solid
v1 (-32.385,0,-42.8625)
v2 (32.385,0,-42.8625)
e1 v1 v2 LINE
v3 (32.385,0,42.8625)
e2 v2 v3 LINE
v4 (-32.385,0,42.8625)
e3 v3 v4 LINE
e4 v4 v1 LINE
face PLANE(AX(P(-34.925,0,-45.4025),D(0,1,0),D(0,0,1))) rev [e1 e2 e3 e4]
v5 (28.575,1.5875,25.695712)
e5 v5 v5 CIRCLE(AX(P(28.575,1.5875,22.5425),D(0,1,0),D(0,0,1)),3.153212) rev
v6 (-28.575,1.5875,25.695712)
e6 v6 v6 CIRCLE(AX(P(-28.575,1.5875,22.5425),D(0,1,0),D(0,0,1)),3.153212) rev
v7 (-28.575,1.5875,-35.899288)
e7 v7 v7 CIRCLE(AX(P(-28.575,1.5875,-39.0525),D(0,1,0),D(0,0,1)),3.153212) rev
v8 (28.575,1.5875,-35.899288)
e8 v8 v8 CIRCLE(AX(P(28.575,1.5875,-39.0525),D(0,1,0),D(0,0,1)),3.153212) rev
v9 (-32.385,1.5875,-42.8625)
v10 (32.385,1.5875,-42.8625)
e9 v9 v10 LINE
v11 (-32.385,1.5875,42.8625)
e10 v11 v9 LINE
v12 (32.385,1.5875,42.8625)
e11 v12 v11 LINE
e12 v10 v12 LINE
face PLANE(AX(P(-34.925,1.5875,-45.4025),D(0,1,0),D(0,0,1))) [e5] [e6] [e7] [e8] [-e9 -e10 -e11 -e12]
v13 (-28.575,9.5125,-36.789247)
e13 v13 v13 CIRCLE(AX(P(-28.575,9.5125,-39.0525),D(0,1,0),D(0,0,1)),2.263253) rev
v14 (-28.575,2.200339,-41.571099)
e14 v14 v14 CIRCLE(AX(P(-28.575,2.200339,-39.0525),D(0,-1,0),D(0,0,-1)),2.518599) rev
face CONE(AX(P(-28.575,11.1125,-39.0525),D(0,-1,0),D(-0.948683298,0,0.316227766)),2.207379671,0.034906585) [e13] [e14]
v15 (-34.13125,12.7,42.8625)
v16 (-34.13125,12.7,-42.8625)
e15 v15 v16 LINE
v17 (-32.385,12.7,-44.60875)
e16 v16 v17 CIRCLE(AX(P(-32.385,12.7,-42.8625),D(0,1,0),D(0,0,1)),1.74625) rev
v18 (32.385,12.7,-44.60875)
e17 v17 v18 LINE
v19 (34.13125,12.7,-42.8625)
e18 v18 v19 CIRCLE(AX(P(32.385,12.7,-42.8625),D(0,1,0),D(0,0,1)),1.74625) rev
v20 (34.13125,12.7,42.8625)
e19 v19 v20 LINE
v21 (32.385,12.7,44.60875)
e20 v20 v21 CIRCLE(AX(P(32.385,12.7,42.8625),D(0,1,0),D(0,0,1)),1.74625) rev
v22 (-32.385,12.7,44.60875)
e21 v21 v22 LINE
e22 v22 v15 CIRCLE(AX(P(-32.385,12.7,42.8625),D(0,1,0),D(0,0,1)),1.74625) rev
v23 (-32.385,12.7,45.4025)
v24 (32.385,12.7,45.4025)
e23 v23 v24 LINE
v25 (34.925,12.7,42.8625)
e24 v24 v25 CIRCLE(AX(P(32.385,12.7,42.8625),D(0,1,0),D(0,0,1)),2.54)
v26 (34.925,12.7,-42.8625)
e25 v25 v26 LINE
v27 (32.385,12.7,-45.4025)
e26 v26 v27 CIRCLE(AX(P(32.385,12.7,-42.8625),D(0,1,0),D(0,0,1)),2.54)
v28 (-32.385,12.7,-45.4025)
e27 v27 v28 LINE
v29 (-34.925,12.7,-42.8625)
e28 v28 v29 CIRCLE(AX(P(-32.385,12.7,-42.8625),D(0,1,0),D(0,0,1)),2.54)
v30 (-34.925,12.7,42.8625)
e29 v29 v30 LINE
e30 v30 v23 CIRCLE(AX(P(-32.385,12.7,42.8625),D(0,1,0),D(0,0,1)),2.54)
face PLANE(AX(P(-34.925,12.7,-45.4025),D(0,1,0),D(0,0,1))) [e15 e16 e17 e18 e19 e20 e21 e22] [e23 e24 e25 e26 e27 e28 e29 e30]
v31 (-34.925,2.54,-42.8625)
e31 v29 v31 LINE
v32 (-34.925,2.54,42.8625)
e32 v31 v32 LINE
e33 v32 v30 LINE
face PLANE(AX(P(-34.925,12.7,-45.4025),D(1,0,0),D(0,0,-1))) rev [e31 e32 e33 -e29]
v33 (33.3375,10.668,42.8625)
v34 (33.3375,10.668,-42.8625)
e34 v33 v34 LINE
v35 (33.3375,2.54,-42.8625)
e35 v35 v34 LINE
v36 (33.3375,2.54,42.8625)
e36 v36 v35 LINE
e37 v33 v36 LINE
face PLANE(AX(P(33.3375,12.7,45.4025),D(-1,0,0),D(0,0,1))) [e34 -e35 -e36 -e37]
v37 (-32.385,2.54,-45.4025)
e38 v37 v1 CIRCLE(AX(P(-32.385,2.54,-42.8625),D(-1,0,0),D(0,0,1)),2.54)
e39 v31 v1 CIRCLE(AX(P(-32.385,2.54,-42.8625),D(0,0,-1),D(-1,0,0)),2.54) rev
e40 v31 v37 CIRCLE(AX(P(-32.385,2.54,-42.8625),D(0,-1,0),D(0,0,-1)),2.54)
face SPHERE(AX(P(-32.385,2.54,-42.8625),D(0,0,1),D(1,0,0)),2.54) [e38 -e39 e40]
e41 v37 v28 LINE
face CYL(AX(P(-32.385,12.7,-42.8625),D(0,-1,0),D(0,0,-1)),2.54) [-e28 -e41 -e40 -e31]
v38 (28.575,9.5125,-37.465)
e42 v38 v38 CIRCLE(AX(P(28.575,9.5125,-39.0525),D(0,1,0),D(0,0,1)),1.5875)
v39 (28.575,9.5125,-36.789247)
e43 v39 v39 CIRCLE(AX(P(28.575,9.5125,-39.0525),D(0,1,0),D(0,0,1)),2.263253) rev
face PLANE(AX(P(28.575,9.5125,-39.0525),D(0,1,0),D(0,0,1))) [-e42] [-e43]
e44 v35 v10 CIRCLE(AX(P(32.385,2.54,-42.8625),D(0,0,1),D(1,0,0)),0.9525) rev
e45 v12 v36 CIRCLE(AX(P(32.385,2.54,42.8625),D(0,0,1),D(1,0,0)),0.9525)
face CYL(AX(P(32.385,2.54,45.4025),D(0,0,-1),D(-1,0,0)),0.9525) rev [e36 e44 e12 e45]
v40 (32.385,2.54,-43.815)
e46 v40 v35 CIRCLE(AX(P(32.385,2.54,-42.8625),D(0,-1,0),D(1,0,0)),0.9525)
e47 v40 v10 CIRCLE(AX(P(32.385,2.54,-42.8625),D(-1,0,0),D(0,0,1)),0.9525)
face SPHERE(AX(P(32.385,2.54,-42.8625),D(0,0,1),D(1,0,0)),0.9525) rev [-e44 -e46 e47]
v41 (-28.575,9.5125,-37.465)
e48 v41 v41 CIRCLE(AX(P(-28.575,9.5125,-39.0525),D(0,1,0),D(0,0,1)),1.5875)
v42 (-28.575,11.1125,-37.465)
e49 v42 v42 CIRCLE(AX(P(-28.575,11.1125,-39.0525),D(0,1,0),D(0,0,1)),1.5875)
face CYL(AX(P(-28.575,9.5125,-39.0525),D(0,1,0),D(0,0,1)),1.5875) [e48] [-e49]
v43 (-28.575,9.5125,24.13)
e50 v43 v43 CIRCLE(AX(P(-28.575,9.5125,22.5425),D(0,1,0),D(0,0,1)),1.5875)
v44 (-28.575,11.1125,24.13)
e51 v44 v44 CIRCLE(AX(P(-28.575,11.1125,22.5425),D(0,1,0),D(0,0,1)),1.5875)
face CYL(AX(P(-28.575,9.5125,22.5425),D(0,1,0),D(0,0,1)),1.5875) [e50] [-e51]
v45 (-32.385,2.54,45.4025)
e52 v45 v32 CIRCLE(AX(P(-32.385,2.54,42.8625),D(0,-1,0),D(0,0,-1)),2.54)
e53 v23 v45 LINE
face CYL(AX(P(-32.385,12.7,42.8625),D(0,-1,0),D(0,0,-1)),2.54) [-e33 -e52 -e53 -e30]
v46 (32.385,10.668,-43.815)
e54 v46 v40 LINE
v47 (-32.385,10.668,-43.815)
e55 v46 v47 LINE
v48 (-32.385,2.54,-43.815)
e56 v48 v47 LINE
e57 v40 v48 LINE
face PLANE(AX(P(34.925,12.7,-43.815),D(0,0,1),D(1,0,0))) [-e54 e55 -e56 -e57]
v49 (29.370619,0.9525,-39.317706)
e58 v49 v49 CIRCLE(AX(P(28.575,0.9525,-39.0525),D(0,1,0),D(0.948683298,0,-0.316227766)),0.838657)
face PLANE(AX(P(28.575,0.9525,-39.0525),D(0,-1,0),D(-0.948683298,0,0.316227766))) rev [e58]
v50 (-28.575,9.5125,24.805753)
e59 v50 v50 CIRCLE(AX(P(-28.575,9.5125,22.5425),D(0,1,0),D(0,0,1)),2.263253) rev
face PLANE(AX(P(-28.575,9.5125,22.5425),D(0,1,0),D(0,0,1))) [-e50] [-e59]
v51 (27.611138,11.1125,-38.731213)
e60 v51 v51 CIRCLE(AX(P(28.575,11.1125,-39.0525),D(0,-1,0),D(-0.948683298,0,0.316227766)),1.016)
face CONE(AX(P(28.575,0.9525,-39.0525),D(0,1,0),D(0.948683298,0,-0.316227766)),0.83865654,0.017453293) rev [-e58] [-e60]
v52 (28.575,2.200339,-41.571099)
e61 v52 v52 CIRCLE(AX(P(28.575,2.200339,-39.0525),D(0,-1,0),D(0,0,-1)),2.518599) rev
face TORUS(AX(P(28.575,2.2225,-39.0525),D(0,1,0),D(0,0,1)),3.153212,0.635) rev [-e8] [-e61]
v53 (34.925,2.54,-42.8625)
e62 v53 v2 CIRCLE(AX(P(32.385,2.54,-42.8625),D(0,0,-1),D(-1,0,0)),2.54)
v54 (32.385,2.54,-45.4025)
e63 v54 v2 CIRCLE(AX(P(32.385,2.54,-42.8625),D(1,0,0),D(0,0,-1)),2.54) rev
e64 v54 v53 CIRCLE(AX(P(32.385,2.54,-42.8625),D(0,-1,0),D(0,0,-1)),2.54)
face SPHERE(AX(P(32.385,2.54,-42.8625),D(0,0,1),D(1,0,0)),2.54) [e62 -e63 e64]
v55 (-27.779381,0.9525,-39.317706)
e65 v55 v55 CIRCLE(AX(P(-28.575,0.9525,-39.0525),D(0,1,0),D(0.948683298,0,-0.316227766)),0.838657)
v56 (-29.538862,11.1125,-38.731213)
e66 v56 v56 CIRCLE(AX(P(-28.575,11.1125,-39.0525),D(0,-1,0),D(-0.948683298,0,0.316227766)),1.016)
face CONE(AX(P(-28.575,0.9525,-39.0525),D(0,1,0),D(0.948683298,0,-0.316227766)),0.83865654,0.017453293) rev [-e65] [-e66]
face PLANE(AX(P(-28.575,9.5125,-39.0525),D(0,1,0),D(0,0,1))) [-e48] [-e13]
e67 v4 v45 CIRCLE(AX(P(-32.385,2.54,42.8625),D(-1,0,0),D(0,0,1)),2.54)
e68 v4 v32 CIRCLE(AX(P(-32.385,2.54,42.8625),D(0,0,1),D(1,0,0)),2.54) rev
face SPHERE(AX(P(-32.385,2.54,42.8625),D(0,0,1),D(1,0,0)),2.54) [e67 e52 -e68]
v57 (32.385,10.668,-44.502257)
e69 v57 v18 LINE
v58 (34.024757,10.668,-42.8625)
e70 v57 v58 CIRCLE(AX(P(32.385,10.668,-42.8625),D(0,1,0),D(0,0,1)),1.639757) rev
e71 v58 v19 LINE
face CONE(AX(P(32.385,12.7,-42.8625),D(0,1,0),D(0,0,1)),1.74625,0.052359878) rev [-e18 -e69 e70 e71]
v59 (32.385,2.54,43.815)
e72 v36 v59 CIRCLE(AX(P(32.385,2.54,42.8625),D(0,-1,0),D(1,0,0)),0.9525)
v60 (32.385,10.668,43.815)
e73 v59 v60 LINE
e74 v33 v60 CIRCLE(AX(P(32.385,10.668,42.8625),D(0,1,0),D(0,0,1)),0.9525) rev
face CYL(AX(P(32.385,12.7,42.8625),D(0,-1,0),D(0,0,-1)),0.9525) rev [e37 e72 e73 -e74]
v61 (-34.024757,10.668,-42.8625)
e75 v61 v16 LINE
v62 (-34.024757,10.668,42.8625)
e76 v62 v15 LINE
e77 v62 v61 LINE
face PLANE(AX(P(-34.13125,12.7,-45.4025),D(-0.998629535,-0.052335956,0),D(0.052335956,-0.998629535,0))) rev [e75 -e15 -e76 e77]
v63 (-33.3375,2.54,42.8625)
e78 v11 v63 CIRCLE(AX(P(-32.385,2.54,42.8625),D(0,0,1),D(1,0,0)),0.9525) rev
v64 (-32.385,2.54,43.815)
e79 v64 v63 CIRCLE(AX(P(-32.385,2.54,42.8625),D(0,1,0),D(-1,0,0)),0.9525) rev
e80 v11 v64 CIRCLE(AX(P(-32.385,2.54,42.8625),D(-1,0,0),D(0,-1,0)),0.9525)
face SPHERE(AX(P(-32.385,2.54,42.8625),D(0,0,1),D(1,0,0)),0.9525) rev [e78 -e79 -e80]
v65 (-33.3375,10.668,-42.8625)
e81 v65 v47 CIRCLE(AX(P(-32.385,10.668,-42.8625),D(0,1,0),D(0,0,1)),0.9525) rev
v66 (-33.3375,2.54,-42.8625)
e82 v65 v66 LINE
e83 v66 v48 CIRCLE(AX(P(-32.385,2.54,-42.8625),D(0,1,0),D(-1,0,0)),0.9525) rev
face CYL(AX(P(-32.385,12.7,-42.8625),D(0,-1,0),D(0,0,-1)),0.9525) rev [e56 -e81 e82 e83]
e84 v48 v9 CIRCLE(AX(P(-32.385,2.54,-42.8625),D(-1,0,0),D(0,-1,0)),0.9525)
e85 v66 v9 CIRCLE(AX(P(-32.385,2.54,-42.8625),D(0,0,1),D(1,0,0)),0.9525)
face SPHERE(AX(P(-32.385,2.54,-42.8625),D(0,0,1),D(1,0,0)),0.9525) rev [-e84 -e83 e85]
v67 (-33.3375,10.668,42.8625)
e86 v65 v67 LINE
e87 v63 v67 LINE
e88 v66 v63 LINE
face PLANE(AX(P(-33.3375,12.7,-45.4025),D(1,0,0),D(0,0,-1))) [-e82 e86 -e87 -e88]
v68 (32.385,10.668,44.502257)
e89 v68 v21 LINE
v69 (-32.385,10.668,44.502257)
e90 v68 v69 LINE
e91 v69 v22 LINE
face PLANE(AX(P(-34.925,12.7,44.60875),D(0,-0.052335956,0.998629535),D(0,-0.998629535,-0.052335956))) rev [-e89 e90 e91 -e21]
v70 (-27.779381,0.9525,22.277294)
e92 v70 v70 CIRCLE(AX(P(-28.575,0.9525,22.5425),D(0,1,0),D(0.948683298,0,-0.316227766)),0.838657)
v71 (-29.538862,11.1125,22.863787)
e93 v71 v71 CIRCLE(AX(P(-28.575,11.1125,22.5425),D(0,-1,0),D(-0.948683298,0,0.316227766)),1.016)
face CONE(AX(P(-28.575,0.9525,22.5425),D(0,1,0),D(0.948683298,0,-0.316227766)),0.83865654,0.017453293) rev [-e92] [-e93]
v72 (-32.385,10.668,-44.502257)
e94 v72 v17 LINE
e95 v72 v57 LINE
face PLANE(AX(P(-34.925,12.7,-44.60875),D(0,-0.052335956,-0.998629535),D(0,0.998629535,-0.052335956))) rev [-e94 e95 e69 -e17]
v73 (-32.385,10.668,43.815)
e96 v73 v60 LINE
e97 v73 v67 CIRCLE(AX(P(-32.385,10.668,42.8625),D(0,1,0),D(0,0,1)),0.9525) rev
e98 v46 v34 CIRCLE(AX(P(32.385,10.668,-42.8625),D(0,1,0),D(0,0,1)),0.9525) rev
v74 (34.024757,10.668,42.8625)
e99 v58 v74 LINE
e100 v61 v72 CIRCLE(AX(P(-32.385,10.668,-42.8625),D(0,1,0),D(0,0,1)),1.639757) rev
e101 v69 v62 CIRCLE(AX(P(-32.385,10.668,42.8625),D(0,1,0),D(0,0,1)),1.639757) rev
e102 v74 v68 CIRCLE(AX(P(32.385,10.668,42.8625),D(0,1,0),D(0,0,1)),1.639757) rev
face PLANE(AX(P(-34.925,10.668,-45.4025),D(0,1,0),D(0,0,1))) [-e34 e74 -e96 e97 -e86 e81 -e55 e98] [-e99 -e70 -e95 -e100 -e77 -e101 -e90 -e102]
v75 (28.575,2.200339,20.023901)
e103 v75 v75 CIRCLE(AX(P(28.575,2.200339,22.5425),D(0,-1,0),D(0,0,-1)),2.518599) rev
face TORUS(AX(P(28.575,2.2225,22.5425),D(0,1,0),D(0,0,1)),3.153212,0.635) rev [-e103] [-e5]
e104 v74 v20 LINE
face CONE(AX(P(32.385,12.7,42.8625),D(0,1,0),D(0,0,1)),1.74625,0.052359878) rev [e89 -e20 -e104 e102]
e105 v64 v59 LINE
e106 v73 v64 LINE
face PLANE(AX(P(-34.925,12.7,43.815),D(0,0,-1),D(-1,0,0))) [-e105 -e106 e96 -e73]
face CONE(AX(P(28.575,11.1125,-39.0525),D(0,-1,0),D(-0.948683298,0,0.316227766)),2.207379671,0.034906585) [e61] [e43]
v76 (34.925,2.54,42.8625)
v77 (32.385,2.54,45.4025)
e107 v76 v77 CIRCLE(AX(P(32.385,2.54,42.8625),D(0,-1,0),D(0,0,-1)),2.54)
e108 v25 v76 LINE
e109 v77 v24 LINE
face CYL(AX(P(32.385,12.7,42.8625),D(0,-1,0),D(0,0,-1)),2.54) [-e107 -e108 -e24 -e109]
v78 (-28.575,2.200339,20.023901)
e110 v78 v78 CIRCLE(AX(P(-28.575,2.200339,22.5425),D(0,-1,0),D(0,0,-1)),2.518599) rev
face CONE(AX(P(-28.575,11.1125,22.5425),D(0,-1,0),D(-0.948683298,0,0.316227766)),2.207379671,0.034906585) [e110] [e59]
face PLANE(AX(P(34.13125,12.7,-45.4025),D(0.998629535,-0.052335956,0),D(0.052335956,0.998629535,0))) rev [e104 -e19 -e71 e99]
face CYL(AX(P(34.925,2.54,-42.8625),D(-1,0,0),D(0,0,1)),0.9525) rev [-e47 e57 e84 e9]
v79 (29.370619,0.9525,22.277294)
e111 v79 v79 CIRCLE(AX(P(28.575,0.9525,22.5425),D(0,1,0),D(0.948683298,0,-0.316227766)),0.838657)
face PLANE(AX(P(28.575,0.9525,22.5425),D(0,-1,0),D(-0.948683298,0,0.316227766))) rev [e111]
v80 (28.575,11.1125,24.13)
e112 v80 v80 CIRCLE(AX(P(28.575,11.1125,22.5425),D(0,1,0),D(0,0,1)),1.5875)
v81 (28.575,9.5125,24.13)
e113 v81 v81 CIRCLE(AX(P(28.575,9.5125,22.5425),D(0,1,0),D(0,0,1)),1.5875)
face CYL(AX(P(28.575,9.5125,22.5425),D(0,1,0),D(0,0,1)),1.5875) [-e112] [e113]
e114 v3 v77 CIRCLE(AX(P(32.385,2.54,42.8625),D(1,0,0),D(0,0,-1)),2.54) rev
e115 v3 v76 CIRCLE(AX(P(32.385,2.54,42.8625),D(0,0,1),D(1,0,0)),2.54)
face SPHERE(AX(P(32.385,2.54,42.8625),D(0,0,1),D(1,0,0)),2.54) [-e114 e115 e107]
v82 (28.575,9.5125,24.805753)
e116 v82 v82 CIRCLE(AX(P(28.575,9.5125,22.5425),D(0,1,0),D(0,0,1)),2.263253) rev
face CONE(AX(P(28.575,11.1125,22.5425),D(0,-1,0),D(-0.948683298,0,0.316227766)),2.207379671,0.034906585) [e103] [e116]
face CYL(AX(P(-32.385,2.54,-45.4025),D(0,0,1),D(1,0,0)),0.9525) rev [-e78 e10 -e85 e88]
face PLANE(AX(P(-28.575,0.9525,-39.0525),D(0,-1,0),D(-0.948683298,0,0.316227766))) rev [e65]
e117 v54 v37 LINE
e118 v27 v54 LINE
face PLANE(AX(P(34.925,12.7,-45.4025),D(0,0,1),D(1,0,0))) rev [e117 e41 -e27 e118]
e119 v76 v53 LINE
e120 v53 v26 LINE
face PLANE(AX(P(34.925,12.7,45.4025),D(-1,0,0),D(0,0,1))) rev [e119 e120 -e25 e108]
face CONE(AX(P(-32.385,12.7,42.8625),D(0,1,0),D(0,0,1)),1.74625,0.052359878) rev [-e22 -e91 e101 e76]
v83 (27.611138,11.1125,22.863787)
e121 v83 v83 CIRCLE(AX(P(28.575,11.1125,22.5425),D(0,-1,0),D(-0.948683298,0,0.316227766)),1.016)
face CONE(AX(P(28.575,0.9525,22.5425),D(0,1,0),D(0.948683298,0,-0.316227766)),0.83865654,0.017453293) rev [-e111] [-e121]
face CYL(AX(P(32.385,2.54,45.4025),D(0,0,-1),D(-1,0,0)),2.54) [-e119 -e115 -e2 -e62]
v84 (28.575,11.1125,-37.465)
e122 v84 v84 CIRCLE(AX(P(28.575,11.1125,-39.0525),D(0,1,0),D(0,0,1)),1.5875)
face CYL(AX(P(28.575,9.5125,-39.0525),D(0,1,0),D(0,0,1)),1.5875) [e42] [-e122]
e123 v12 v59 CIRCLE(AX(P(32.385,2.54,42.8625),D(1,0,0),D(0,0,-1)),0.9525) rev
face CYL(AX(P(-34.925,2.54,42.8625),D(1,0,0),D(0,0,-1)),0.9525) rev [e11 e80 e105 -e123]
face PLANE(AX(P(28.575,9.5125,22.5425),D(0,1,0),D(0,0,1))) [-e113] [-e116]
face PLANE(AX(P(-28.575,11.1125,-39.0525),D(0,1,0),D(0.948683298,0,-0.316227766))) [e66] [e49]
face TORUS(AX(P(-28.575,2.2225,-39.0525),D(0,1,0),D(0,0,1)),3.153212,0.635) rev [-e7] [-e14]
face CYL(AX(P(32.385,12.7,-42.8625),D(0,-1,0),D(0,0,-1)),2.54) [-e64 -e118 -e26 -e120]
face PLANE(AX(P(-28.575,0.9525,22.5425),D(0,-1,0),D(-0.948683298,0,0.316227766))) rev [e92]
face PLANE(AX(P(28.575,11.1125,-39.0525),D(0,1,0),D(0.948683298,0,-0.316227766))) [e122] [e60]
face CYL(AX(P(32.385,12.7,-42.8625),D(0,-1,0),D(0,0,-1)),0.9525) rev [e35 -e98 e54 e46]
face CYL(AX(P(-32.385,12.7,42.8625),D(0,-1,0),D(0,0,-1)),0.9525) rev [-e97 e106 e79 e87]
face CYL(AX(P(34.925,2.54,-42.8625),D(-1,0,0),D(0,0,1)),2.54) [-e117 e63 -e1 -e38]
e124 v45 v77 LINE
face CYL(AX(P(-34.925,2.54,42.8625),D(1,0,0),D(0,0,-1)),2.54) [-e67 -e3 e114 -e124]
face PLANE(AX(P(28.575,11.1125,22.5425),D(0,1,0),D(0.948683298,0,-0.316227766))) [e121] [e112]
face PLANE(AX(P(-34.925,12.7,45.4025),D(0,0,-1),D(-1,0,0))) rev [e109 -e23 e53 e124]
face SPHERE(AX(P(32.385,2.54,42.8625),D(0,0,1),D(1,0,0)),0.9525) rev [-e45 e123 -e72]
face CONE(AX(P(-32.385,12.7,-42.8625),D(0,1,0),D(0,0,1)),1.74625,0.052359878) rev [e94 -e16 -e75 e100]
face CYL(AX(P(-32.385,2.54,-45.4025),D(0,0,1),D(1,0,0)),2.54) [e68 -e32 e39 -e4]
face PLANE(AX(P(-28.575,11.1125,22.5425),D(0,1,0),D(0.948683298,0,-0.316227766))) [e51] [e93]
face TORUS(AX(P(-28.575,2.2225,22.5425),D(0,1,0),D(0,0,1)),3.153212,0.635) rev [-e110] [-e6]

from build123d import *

# Parameters (mm, degrees)
SKETCH2_W               = 69.85
SKETCH2_H               = 90.805
BOSS_EXTRUDE1_DEPTH     = 12.7
FILLET1_R               = 2.54
SHELL1_T                = -1.5875
SKETCH3_R               = 2.8575
SKETCH3_R_2             = 1.5875
CUT_EXTRUDE_THIN1_DEPTH = 1.6
LPATTERN1_COUNT         = 2
LPATTERN1_PITCH         = 57.15
LPATTERN1_COUNT_DIR2    = 2
LPATTERN1_PITCH_DIR2    = 61.595
FILLET3_R               = 0.635


with BuildPart() as part:
    # Sketch2 → Boss-Extrude1 (new body)
    with BuildSketch(Plane(origin=(0, 0, 0), x_dir=(1, 0, 0), z_dir=(0, 1, 0))):
        Rectangle(SKETCH2_W, SKETCH2_H)
    extrude(amount=BOSS_EXTRUDE1_DEPTH)

    # Fillet1
    fillet1_edges = [part.edges().sort_by_distance(p)[0] for p in [
        (34.925, 0, 0),
        (0, 0, 45.4025),
        (-34.925, 0, 0),
        (0, 0, -45.4025),
        (34.925, 6.35, -45.4025),
        (34.925, 6.35, 45.4025),
        (-34.925, 6.35, 45.4025),
        (-34.925, 6.35, -45.4025),
    ]]
    fillet(fillet1_edges, radius=FILLET1_R)

    # Shell1
    shell1_openings = [part.faces().sort_by_distance(p)[0] for p in [
        (0, 12.7, 0),
    ]]
    offset(amount=SHELL1_T, openings=shell1_openings, kind=Kind.INTERSECTION)

    # Groove1: read off the stored shape, not the designer's step
    # Groove1: loft between two sections, ruled curve by curve
    groove1_from = [
        Edge.make_three_point_arc((32.385, 10.668, 44.502257392), (33.544483572, 10.668, 44.021983572), (34.024757392, 10.668, 42.8625)),
        Edge.make_three_point_arc((34.024757392, 10.668, -42.8625), (33.544483572, 10.668, -44.021983572), (32.385, 10.668, -44.502257392)),
        Edge.make_three_point_arc((-32.385, 10.668, -44.502257392), (-33.544483572, 10.668, -44.021983572), (-34.024757392, 10.668, -42.8625)),
        Edge.make_three_point_arc((-34.024757392, 10.668, 42.8625), (-33.544483572, 10.668, 44.021983572), (-32.385, 10.668, 44.502257392)),
        Edge.make_line((32.385, 10.668, 44.502257392), (-32.385, 10.668, 44.502257392)),
        Edge.make_line((34.024757392, 10.668, -42.8625), (34.024757392, 10.668, 42.8625)),
        Edge.make_line((-32.385, 10.668, -44.502257392), (32.385, 10.668, -44.502257392)),
        Edge.make_line((-34.024757392, 10.668, 42.8625), (-34.024757392, 10.668, -42.8625)),
    ]
    groove1_to = [
        Edge.make_three_point_arc((32.385, 12.7, 44.60875), (33.619785217, 12.7, 44.097285217), (34.13125, 12.7, 42.8625)),
        Edge.make_three_point_arc((34.13125, 12.7, -42.8625), (33.619785217, 12.7, -44.097285217), (32.385, 12.7, -44.60875)),
        Edge.make_three_point_arc((-32.385, 12.7, -44.60875), (-33.619785217, 12.7, -44.097285217), (-34.13125, 12.7, -42.8625)),
        Edge.make_three_point_arc((-34.13125, 12.7, 42.8625), (-33.619785217, 12.7, 44.097285217), (-32.385, 12.7, 44.60875)),
        Edge.make_line((32.385, 12.7, 44.60875), (-32.385, 12.7, 44.60875)),
        Edge.make_line((34.13125, 12.7, -42.8625), (34.13125, 12.7, 42.8625)),
        Edge.make_line((-32.385, 12.7, -44.60875), (32.385, 12.7, -44.60875)),
        Edge.make_line((-34.13125, 12.7, 42.8625), (-34.13125, 12.7, -42.8625)),
    ]
    groove1 = Solid(Shell([*[Face.make_surface_from_curves(groove1_from[k], groove1_to[k]) for k in range(8)], Face(Wire(groove1_from)), Face(Wire(groove1_to))]))
    add(groove1, mode=Mode.SUBTRACT)

    # Mounting Boss1: read off the stored shape, not the designer's step
    # Mounting Boss1 outline → Mounting Boss1 (revolve, cut)
    with BuildSketch(Plane(origin=(-28.575, 0, -39.0525), x_dir=(1, 0, 0), z_dir=(0, 0, 1))):
        Polygon((0.83865654, 0.9525), (0.849740506, 1.5875), (0, 1.5875), (0, 0.9525), align=None)
    mounting_boss1 = revolve(axis=Axis((-28.575, 0, -39.0525), (0, 1, 0)), mode=Mode.SUBTRACT)

    # Mounting Boss1 2 outline → Mounting Boss1 2 (revolve)
    with BuildSketch(Plane(origin=(-28.575, 0, -39.0525), x_dir=(1, 0, 0), z_dir=(0, 0, 1))):
        Polygon((2.207379671, 11.1125), (1.016, 11.1125), (0.849740506, 1.5875), (2.54, 1.5875), align=None)
    mounting_boss1_2 = revolve(axis=Axis((-28.575, 0, -39.0525), (0, 1, 0)))

    # Sketch3 → Cut-Extrude-Thin1 (cut)
    with BuildSketch(Plane(origin=(0, 11.1125, 0), x_dir=(1, 0, 0), z_dir=(0, 1, 0))):
        with Locations((-28.575, 39.0525)):
            Circle(SKETCH3_R)
        with Locations((-28.575, 39.0525)):
            Circle(SKETCH3_R_2, mode=Mode.SUBTRACT)
    cut_extrude_thin1 = extrude(amount=-CUT_EXTRUDE_THIN1_DEPTH, mode=Mode.SUBTRACT)

    # LPattern1: Mounting Boss1, Mounting Boss1 2, Cut-Extrude-Thin1 2 × 2
    with Locations(*[(i * LPATTERN1_PITCH, 0, j * LPATTERN1_PITCH_DIR2) for i in range(LPATTERN1_COUNT) for j in range(LPATTERN1_COUNT_DIR2) if (i, j) != (0, 0)]):
        add(mounting_boss1, mode=Mode.SUBTRACT)
        add(mounting_boss1_2)
        add(cut_extrude_thin1, mode=Mode.SUBTRACT)

    # Fillet3
    fillet3_edges = [part.edges().sort_by_distance(p)[0] for p in [
        (-31.115, 1.5875, -39.0525),
        (-31.115, 1.5875, 22.5425),
        (26.035, 1.5875, -39.0525),
        (26.035, 1.5875, 22.5425),
    ]]
    fillet(fillet3_edges, radius=FILLET3_R)


solid = part.part
